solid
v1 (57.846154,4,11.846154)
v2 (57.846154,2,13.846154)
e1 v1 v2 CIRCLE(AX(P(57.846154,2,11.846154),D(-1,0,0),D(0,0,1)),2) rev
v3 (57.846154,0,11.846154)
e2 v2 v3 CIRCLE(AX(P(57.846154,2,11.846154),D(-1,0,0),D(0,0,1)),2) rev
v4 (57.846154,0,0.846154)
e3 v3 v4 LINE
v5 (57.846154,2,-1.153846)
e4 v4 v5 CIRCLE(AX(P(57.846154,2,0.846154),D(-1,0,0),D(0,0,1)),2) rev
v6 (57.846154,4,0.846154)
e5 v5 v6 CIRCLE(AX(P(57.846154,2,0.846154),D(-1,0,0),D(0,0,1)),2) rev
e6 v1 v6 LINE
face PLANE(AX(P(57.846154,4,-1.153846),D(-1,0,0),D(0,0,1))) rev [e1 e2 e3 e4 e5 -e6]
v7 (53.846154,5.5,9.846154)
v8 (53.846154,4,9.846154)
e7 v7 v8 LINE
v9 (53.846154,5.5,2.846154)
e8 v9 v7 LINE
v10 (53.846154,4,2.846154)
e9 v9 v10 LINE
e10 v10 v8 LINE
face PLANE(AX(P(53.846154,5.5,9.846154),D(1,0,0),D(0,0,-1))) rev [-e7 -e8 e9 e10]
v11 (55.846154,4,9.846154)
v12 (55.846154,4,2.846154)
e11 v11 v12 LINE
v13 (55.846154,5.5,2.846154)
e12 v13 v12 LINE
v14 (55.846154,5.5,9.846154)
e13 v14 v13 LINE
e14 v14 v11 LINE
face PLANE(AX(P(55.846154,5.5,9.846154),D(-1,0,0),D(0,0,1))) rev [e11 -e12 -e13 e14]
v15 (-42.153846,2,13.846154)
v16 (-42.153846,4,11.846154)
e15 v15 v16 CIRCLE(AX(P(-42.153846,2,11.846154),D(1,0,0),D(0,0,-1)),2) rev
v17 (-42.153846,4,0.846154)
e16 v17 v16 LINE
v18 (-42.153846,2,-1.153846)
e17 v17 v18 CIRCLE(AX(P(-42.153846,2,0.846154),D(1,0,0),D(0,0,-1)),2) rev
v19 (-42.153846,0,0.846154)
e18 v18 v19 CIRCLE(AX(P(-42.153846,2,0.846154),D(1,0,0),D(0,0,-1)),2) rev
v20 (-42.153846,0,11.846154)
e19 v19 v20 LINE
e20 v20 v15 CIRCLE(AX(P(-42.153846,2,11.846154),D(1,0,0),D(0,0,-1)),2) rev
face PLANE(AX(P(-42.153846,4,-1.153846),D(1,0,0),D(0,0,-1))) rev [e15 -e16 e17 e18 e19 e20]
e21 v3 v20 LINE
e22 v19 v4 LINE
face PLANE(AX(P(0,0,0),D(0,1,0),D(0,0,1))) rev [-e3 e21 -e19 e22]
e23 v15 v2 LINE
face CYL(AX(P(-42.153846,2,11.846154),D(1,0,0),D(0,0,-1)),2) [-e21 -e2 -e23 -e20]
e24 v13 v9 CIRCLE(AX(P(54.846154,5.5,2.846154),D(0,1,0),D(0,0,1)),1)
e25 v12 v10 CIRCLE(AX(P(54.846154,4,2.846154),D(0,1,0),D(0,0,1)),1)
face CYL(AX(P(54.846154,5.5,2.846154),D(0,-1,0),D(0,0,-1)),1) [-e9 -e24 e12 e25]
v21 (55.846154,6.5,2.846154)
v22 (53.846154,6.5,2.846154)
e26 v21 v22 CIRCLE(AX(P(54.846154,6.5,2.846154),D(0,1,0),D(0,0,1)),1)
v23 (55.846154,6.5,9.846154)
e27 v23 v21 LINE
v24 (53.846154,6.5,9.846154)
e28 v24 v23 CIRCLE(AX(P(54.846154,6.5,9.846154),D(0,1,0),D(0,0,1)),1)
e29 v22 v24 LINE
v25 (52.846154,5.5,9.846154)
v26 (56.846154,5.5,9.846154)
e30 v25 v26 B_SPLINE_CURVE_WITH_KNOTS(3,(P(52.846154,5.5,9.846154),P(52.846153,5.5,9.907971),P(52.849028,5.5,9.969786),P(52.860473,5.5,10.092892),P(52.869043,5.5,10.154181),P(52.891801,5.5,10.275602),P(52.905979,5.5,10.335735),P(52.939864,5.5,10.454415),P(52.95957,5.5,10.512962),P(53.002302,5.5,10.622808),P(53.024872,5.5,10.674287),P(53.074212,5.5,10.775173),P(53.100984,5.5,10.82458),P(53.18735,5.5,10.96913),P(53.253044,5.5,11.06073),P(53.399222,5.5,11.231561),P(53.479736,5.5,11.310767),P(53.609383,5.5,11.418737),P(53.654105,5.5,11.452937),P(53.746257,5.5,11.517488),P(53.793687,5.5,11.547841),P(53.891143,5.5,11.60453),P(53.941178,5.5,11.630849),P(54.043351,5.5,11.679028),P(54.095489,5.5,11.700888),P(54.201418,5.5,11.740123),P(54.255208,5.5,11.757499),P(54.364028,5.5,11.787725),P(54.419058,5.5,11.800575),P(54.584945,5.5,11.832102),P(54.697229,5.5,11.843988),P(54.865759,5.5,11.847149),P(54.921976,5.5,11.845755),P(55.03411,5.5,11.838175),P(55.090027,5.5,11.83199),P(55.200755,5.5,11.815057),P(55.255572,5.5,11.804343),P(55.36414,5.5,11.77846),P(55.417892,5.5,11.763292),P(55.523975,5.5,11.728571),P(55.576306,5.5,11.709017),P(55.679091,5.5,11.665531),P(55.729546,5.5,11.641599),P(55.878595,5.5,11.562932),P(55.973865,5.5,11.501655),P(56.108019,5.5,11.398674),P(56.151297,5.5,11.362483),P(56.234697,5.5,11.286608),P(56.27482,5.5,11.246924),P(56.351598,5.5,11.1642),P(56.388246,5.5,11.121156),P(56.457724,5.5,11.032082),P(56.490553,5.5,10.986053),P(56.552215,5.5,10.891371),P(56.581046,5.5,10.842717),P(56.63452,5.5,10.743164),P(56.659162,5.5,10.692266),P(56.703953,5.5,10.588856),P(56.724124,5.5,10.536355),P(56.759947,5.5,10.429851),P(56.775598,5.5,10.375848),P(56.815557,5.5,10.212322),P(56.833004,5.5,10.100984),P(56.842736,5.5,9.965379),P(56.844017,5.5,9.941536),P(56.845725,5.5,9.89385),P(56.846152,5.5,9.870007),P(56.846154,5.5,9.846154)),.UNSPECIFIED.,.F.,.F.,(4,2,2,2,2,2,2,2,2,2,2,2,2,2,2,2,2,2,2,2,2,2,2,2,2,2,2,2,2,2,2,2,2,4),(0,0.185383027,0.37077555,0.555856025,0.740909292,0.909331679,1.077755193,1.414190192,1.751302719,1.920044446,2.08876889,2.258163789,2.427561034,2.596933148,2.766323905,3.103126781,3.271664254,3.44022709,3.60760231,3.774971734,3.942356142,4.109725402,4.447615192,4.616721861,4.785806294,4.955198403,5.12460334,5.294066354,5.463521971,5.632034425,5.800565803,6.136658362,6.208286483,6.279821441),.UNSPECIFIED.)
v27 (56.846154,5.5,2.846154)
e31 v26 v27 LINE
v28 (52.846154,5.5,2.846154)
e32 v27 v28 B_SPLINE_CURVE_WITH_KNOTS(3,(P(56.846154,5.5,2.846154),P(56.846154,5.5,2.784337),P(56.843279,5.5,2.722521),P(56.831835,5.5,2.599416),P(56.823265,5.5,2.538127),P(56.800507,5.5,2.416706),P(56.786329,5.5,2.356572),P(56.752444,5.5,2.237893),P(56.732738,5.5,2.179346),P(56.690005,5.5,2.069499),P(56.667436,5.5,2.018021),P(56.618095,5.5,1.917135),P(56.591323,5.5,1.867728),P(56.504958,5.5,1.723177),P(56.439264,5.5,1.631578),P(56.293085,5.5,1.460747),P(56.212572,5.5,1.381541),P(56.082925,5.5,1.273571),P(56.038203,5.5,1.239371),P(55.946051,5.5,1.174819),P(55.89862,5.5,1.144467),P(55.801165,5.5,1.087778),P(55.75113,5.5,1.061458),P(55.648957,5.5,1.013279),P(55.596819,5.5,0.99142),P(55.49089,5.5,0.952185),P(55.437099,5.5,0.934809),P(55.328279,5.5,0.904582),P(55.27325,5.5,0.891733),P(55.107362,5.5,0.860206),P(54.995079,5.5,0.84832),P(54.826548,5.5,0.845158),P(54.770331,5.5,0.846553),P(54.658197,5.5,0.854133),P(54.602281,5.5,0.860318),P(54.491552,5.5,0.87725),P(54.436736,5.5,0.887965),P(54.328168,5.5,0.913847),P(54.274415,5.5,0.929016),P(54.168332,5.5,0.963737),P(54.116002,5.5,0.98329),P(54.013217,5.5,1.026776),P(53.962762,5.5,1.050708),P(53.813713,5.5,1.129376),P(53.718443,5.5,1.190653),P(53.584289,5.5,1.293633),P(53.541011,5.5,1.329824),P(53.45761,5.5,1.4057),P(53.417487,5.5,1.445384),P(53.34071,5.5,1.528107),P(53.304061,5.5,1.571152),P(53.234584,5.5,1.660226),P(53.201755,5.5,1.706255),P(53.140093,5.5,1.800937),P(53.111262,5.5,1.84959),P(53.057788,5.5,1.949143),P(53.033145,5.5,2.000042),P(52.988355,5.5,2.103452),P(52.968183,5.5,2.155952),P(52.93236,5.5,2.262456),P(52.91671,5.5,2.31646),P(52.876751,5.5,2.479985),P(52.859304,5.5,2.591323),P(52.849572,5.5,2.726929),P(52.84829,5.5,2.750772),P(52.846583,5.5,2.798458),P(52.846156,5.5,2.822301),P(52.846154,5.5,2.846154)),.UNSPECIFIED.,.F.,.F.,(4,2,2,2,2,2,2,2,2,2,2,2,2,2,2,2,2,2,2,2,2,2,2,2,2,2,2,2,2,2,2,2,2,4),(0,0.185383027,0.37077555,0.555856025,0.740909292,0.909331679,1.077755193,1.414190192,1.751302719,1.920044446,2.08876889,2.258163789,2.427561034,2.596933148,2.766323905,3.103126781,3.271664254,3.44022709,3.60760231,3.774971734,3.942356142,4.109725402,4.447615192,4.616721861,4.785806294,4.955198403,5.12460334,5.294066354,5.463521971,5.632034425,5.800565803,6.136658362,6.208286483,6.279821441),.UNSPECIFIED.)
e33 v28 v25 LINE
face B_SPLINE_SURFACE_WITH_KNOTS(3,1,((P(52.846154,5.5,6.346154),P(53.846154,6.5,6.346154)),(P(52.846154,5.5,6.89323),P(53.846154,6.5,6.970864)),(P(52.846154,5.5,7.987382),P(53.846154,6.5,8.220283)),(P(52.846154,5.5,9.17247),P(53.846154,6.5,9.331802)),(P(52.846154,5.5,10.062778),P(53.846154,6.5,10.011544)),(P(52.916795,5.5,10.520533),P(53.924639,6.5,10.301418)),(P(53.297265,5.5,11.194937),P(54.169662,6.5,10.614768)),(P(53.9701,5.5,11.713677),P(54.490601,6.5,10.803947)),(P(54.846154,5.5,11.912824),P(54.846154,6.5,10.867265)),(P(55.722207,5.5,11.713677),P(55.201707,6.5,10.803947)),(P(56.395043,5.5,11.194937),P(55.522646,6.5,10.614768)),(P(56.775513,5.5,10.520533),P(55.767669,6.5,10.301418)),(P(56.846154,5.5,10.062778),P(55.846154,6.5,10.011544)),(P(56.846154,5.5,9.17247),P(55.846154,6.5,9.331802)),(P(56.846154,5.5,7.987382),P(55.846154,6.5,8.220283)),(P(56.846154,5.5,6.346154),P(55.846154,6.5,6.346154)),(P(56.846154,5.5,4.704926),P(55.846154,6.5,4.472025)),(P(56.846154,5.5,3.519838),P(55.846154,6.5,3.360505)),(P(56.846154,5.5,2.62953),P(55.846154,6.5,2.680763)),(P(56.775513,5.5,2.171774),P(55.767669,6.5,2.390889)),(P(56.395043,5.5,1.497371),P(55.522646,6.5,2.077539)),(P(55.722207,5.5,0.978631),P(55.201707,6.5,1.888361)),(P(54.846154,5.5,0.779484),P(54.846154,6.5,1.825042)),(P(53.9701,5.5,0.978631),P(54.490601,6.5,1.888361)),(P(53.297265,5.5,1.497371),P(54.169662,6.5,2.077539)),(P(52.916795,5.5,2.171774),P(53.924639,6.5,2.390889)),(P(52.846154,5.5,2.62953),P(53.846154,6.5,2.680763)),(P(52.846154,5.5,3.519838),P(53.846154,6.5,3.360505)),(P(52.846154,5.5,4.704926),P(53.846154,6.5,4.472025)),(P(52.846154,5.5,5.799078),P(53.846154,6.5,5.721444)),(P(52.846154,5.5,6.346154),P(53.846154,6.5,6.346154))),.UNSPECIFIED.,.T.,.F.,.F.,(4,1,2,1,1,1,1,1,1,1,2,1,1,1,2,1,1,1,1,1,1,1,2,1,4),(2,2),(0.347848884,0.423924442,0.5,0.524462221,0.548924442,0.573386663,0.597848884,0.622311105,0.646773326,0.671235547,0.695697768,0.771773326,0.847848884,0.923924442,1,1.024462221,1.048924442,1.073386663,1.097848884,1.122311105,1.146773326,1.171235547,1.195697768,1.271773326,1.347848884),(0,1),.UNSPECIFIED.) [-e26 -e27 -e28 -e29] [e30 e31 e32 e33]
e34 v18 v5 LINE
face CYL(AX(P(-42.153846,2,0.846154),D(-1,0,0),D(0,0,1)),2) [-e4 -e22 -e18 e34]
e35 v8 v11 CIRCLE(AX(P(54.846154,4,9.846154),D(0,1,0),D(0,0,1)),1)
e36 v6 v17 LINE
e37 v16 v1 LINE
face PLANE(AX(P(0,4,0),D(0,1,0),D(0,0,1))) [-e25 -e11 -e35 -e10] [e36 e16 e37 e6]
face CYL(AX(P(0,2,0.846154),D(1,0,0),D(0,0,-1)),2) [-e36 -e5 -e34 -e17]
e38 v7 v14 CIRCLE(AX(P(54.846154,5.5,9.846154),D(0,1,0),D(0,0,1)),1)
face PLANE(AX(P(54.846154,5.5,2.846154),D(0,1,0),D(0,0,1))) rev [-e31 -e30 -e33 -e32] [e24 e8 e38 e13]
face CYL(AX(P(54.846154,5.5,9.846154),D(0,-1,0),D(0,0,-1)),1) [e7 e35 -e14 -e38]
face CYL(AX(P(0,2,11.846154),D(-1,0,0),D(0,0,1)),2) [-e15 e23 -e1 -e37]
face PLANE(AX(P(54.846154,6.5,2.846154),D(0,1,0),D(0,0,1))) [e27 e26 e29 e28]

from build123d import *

# Parameters (mm, degrees)
SKETCH2_W           = 100
SKETCH2_H           = 15
BOSS_EXTRUDE1_DEPTH = 4
FILLET4_R           = 2
BOSS_EXTRUDE4_DEPTH = 1.5


with BuildPart() as part:
    # Sketch2 → Boss-Extrude1 (new body)
    with BuildSketch(Plane(origin=(0, 0, 0), x_dir=(1, 0, 0), z_dir=(0, 1, 0))):
        with Locations((7.846153846, -6.346153846)):
            Rectangle(SKETCH2_W, SKETCH2_H)
    extrude(amount=BOSS_EXTRUDE1_DEPTH)

    # Fillet4
    fillet4_edges = [part.edges().sort_by_distance(p)[0] for p in [
        (7.846153846, 4, -1.153846154),
        (7.846153846, 0, -1.153846154),
        (7.846153846, 4, 13.846153846),
        (7.846153846, 0, 13.846153846),
    ]]
    fillet(fillet4_edges, radius=FILLET4_R - 0.0001)  # a hair under: the kernel refuses the full size

    # Sketch10 → Boss-Extrude4 (add)
    with BuildSketch(Plane(origin=(0, 4, 0), x_dir=(1, 0, 0), z_dir=(0, 1, 0))):
        with BuildLine():
            Line((53.846153846, -9.846153846), (53.846153846, -2.846153846))
            ThreePointArc((53.846153846, -2.846153846), (54.846153846, -1.846153846), (55.846153846, -2.846153846))
            Line((55.846153846, -2.846153846), (55.846153846, -9.846153846))
            ThreePointArc((55.846153846, -9.846153846), (54.846153846, -10.846153846), (53.846153846, -9.846153846))
        make_face()
    extrude(amount=BOSS_EXTRUDE4_DEPTH)

    # Loft6: read off the stored shape, not the designer's step
    # Loft6: loft between two sections, ruled curve by curve
    loft6_from = [
        Edge.make_bspline([(52.846153846, 5.5, 6.346153846), (52.846153846, 5.5, 6.893229755), (52.846153846, 5.5, 7.987381572), (52.846153846, 5.5, 9.172470024), (52.846153846, 5.5, 10.062777988), (52.916794739, 5.5, 10.520533365), (53.297264612, 5.5, 11.19493708), (53.970100399, 5.5, 11.713677023), (54.846153846, 5.5, 11.912823977), (55.722207294, 5.5, 11.713677023), (56.395043081, 5.5, 11.19493708), (56.775512954, 5.5, 10.520533365), (56.846153846, 5.5, 10.062777988), (56.846153846, 5.5, 9.172470024), (56.846153846, 5.5, 7.987381572), (56.846153846, 5.5, 6.346153846), (56.846153846, 5.5, 4.70492612), (56.846153846, 5.5, 3.519837669), (56.846153846, 5.5, 2.629529705), (56.775512954, 5.5, 2.171774328), (56.395043081, 5.5, 1.497370612), (55.722207294, 5.5, 0.97863067), (54.846153846, 5.5, 0.779483716), (53.970100399, 5.5, 0.97863067), (53.297264612, 5.5, 1.497370612), (52.916794739, 5.5, 2.171774328), (52.846153846, 5.5, 2.629529705), (52.846153846, 5.5, 3.519837669), (52.846153846, 5.5, 4.70492612), (52.846153846, 5.5, 5.799077937), (52.846153846, 5.5, 6.346153846)], [0.347848884, 0.347848884, 0.347848884, 0.347848884, 0.423924442, 0.5, 0.5, 0.524462221, 0.548924442, 0.573386663, 0.597848884, 0.622311105, 0.646773326, 0.671235547, 0.695697768, 0.695697768, 0.771773326, 0.847848884, 0.923924442, 1, 1, 1.024462221, 1.048924442, 1.073386663, 1.097848884, 1.122311105, 1.146773326, 1.171235547, 1.195697768, 1.195697768, 1.271773326, 1.347848884, 1.347848884, 1.347848884, 1.347848884], 3),
    ]
    loft6_to = [
        Edge.make_bspline([(53.846153846, 6.5, 6.346153846), (53.846153846, 6.5, 6.970863619), (53.846153846, 6.5, 8.220283163), (53.846153846, 6.5, 9.3318023), (53.846153846, 6.5, 10.011544432), (53.92463889, 6.5, 10.301418233), (54.169662015, 6.5, 10.614768288), (54.490600847, 6.5, 10.803946654), (54.846153846, 6.5, 10.867265337), (55.201706845, 6.5, 10.803946654), (55.522645677, 6.5, 10.614768288), (55.767668802, 6.5, 10.301418233), (55.846153846, 6.5, 10.011544432), (55.846153846, 6.5, 9.3318023), (55.846153846, 6.5, 8.220283163), (55.846153846, 6.5, 6.346153846), (55.846153846, 6.5, 4.472024529), (55.846153846, 6.5, 3.360505393), (55.846153846, 6.5, 2.68076326), (55.767668802, 6.5, 2.390889459), (55.522645677, 6.5, 2.077539404), (55.201706845, 6.5, 1.888361038), (54.846153846, 6.5, 1.825042355), (54.490600847, 6.5, 1.888361038), (54.169662015, 6.5, 2.077539404), (53.92463889, 6.5, 2.390889459), (53.846153846, 6.5, 2.68076326), (53.846153846, 6.5, 3.360505393), (53.846153846, 6.5, 4.472024529), (53.846153846, 6.5, 5.721444074), (53.846153846, 6.5, 6.346153846)], [0.347848884, 0.347848884, 0.347848884, 0.347848884, 0.423924442, 0.5, 0.5, 0.524462221, 0.548924442, 0.573386663, 0.597848884, 0.622311105, 0.646773326, 0.671235547, 0.695697768, 0.695697768, 0.771773326, 0.847848884, 0.923924442, 1, 1, 1.024462221, 1.048924442, 1.073386663, 1.097848884, 1.122311105, 1.146773326, 1.171235547, 1.195697768, 1.195697768, 1.271773326, 1.347848884, 1.347848884, 1.347848884, 1.347848884], 3),
    ]
    loft6 = Solid(Shell([*[Face.make_surface_from_curves(loft6_from[k], loft6_to[k]) for k in range(1)], Face(Wire(loft6_from)), Face(Wire(loft6_to))]))
    add(loft6)


solid = part.part
